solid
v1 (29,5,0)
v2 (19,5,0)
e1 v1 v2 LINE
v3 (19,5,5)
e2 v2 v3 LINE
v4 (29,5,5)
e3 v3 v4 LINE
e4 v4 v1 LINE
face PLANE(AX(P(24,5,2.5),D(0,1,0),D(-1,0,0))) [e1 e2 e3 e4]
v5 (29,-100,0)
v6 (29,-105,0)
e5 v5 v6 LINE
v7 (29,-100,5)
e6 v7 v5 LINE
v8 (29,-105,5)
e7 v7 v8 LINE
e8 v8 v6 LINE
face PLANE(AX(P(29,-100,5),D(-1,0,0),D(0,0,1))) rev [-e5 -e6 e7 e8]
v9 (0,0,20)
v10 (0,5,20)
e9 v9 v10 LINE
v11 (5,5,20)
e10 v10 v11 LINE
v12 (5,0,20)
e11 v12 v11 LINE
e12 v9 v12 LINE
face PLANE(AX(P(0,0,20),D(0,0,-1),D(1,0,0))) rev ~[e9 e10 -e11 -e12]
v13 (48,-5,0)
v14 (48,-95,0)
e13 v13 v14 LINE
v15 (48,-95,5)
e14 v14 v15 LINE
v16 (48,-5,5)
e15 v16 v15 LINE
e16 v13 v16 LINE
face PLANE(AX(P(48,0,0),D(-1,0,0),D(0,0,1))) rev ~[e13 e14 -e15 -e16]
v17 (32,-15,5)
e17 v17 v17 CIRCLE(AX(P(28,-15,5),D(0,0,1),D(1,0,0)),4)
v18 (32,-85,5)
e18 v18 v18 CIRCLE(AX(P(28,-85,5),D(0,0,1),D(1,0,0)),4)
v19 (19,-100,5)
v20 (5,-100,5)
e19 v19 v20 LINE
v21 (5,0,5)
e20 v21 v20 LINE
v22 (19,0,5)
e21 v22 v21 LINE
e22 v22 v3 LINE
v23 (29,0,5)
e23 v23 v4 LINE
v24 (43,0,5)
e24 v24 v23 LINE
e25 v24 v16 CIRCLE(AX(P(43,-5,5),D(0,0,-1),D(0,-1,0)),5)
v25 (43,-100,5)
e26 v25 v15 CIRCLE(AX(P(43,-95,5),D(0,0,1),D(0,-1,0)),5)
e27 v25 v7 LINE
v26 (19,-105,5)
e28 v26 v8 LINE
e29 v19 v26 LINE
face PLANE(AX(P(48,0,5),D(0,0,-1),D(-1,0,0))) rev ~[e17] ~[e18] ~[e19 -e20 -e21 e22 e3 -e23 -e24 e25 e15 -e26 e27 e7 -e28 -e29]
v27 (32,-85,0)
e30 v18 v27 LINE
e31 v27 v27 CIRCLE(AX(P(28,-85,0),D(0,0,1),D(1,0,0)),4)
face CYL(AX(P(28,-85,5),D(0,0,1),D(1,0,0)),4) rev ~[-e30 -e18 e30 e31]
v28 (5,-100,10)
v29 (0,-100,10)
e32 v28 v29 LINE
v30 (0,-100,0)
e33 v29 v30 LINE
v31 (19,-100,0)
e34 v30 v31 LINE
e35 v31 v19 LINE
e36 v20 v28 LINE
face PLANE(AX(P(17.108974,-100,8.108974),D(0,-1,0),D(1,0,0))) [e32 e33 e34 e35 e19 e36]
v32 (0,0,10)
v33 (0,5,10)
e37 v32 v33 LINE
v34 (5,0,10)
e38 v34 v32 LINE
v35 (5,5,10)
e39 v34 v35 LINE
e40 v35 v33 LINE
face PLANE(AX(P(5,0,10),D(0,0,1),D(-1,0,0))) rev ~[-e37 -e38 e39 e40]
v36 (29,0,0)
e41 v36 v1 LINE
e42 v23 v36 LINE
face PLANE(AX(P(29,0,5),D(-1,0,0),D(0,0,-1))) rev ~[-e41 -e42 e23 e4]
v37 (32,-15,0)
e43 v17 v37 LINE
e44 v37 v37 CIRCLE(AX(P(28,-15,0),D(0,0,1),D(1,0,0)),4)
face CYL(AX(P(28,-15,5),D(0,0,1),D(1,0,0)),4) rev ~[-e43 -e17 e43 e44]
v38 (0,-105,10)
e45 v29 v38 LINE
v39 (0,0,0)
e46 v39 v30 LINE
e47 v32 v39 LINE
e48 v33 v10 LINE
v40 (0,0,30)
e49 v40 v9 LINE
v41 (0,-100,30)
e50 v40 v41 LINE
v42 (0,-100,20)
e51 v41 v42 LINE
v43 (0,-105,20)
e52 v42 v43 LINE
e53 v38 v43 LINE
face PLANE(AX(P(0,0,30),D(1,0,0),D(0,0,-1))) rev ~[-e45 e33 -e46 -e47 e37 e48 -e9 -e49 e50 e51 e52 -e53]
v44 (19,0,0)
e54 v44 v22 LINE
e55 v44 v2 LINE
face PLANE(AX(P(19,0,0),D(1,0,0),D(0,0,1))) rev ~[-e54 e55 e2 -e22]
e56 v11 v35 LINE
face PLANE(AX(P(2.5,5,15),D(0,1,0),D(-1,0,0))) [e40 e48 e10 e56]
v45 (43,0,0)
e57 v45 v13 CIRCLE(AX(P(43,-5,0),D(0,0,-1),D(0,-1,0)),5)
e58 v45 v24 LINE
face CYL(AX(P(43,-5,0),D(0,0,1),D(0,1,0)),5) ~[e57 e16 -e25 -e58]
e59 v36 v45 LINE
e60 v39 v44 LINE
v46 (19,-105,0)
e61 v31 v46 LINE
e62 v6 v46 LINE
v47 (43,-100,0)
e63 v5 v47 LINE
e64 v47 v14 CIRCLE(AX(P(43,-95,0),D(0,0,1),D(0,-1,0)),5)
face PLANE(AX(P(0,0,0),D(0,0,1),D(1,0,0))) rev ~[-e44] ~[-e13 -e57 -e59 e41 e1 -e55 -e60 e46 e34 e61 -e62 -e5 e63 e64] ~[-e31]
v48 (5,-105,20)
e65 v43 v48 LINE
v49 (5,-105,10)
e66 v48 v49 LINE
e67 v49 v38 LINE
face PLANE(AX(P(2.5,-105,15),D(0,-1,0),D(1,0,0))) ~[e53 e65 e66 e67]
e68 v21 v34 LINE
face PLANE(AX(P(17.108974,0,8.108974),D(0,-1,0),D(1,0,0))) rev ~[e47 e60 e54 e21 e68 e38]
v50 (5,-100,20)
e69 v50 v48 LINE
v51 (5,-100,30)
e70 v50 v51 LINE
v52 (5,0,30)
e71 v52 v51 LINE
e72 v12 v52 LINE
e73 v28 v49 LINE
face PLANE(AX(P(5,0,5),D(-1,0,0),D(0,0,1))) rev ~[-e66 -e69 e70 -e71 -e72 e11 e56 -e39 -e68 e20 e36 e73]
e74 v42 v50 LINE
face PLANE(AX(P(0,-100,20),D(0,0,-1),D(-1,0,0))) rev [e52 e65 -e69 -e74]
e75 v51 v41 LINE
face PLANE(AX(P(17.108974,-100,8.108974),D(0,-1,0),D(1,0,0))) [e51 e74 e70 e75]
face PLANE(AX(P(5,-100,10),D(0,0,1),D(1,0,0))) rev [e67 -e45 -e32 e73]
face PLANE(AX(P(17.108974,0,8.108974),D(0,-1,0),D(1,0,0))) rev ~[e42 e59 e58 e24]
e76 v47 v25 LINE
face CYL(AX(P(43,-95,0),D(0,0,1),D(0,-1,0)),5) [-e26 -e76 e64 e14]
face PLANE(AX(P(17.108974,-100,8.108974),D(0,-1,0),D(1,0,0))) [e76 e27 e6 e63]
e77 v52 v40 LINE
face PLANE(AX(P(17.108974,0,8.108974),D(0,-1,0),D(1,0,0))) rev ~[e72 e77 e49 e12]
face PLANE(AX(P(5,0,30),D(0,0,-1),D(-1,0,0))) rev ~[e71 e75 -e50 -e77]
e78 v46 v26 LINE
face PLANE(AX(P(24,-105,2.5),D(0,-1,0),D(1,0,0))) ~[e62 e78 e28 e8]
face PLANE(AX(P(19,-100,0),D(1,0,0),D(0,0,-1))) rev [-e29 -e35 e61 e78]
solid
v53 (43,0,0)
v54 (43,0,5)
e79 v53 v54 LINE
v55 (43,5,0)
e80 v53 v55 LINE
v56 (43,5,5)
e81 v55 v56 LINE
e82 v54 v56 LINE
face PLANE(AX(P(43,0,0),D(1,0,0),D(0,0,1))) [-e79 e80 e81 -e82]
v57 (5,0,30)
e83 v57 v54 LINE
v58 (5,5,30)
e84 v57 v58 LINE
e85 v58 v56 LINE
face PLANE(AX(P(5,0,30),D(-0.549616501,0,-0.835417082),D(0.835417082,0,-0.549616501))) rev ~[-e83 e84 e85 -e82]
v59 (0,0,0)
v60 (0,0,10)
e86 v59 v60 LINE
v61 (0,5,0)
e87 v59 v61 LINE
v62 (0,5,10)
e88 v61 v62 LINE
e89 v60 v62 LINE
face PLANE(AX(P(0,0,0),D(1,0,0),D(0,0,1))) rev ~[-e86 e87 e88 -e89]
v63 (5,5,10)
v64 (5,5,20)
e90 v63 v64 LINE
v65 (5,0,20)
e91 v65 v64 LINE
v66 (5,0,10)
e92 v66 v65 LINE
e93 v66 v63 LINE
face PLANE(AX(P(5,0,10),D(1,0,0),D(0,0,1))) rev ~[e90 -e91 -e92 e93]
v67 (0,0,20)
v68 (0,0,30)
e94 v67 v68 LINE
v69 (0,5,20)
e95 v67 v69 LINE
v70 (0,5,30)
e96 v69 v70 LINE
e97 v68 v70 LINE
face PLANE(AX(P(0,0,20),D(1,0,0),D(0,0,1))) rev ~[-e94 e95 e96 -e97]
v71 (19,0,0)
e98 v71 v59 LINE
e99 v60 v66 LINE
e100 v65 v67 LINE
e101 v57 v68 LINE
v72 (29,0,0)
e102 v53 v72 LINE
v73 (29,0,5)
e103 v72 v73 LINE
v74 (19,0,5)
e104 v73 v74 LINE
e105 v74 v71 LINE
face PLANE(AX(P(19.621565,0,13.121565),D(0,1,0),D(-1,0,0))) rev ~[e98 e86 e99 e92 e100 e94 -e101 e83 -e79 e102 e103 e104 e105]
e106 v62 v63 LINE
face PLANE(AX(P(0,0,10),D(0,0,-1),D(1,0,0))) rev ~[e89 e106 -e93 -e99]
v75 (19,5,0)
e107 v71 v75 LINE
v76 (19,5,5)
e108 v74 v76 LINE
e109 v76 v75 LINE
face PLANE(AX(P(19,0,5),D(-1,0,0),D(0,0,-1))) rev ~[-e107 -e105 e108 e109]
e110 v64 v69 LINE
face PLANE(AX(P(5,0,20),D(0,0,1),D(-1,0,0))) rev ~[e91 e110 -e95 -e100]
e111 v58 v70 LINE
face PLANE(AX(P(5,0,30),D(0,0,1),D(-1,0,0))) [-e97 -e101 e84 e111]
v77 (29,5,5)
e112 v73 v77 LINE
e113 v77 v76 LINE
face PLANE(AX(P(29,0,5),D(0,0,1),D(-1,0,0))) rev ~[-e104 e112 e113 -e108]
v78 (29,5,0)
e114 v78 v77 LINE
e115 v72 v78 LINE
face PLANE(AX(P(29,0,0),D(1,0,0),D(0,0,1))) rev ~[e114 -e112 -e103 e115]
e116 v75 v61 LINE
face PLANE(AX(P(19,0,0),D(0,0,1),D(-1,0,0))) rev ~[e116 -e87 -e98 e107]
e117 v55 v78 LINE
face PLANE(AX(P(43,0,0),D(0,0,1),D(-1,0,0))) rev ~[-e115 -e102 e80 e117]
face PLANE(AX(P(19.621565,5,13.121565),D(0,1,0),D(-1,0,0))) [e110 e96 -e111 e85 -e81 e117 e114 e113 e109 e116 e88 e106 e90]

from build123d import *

# Parameters (mm, degrees)
F1_DEPTH = 100
F2_R     = 4
F3_DEPTH = 25
F4_R     = 5
F6_DEPTH = 5
F8_W     = 5
F8_H     = 10
F8_W_2   = 14
F8_H_2   = 5
F9_DEPTH = 5


# Not quite as in the source:
# - a pattern or mirror of a feature is missing from the dataset's text; its kind, count and spacing are read off the source's solid


with BuildPart() as f1:
    # F0 (on Front) → F1 (new body)
    with BuildSketch(Plane.XZ):
        Polygon((0, 30), (0, 0), (48, 0), (48, 5), (5, 5), (5, 30), align=None)
    extrude(amount=F1_DEPTH)

    # F2 (on face) → F3 (cut)
    with BuildSketch(Plane.XY.offset(5)):
        with Locations((28, -85)):
            Circle(F2_R)
        with Locations((28, -15)):
            Circle(F2_R)
    extrude(amount=-F3_DEPTH, mode=Mode.SUBTRACT)

    # F4
    f4_edges = [f1.edges().sort_by_distance(p)[0] for p in [
        (48, -100, 2.5),
        (48, 0, 2.5),
    ]]
    fillet(f4_edges, radius=F4_R)

    # F5 (on face) → F6 (join)
    with BuildSketch(Plane(origin=(0, 0, 0), x_dir=(-1, 0, 0), z_dir=(0, 1, 0))):
        Polygon((0, 10), (0, 15), (0, 20), (-5, 20), (-5, 10), align=None)
        Polygon((-19, 5), (-24, 5), (-29, 5), (-29, 0), (-19, 0), align=None)
    f6 = extrude(amount=F6_DEPTH)

    # F6_copies: F6 across plane
    add(f6.mirror(Plane(origin=(0, -50, 0), x_dir=(0, 0, -1), z_dir=(0, -1, 0))))


with BuildPart() as f9:
    # F8 (on face) → F9 (new body)
    with BuildSketch(Plane(origin=(0, 0, 0), x_dir=(-1, 0, 0), z_dir=(0, 1, 0))):
        Polygon((-5, 20), (-5, 30), (-43, 5), (-29, 5), (-19, 5), (-5, 5), (-5, 10), align=None)
        with Locations((-2.5, 25)):
            Rectangle(F8_W, F8_H)
        Polygon((0, 10), (-5, 10), (-5, 5), (-19, 5), (-19, 0), (0, 0), align=None)
        with Locations((-36, 2.5)):
            Rectangle(F8_W_2, F8_H_2)
    extrude(amount=F9_DEPTH)


solid = Compound([f1.part, f9.part])
